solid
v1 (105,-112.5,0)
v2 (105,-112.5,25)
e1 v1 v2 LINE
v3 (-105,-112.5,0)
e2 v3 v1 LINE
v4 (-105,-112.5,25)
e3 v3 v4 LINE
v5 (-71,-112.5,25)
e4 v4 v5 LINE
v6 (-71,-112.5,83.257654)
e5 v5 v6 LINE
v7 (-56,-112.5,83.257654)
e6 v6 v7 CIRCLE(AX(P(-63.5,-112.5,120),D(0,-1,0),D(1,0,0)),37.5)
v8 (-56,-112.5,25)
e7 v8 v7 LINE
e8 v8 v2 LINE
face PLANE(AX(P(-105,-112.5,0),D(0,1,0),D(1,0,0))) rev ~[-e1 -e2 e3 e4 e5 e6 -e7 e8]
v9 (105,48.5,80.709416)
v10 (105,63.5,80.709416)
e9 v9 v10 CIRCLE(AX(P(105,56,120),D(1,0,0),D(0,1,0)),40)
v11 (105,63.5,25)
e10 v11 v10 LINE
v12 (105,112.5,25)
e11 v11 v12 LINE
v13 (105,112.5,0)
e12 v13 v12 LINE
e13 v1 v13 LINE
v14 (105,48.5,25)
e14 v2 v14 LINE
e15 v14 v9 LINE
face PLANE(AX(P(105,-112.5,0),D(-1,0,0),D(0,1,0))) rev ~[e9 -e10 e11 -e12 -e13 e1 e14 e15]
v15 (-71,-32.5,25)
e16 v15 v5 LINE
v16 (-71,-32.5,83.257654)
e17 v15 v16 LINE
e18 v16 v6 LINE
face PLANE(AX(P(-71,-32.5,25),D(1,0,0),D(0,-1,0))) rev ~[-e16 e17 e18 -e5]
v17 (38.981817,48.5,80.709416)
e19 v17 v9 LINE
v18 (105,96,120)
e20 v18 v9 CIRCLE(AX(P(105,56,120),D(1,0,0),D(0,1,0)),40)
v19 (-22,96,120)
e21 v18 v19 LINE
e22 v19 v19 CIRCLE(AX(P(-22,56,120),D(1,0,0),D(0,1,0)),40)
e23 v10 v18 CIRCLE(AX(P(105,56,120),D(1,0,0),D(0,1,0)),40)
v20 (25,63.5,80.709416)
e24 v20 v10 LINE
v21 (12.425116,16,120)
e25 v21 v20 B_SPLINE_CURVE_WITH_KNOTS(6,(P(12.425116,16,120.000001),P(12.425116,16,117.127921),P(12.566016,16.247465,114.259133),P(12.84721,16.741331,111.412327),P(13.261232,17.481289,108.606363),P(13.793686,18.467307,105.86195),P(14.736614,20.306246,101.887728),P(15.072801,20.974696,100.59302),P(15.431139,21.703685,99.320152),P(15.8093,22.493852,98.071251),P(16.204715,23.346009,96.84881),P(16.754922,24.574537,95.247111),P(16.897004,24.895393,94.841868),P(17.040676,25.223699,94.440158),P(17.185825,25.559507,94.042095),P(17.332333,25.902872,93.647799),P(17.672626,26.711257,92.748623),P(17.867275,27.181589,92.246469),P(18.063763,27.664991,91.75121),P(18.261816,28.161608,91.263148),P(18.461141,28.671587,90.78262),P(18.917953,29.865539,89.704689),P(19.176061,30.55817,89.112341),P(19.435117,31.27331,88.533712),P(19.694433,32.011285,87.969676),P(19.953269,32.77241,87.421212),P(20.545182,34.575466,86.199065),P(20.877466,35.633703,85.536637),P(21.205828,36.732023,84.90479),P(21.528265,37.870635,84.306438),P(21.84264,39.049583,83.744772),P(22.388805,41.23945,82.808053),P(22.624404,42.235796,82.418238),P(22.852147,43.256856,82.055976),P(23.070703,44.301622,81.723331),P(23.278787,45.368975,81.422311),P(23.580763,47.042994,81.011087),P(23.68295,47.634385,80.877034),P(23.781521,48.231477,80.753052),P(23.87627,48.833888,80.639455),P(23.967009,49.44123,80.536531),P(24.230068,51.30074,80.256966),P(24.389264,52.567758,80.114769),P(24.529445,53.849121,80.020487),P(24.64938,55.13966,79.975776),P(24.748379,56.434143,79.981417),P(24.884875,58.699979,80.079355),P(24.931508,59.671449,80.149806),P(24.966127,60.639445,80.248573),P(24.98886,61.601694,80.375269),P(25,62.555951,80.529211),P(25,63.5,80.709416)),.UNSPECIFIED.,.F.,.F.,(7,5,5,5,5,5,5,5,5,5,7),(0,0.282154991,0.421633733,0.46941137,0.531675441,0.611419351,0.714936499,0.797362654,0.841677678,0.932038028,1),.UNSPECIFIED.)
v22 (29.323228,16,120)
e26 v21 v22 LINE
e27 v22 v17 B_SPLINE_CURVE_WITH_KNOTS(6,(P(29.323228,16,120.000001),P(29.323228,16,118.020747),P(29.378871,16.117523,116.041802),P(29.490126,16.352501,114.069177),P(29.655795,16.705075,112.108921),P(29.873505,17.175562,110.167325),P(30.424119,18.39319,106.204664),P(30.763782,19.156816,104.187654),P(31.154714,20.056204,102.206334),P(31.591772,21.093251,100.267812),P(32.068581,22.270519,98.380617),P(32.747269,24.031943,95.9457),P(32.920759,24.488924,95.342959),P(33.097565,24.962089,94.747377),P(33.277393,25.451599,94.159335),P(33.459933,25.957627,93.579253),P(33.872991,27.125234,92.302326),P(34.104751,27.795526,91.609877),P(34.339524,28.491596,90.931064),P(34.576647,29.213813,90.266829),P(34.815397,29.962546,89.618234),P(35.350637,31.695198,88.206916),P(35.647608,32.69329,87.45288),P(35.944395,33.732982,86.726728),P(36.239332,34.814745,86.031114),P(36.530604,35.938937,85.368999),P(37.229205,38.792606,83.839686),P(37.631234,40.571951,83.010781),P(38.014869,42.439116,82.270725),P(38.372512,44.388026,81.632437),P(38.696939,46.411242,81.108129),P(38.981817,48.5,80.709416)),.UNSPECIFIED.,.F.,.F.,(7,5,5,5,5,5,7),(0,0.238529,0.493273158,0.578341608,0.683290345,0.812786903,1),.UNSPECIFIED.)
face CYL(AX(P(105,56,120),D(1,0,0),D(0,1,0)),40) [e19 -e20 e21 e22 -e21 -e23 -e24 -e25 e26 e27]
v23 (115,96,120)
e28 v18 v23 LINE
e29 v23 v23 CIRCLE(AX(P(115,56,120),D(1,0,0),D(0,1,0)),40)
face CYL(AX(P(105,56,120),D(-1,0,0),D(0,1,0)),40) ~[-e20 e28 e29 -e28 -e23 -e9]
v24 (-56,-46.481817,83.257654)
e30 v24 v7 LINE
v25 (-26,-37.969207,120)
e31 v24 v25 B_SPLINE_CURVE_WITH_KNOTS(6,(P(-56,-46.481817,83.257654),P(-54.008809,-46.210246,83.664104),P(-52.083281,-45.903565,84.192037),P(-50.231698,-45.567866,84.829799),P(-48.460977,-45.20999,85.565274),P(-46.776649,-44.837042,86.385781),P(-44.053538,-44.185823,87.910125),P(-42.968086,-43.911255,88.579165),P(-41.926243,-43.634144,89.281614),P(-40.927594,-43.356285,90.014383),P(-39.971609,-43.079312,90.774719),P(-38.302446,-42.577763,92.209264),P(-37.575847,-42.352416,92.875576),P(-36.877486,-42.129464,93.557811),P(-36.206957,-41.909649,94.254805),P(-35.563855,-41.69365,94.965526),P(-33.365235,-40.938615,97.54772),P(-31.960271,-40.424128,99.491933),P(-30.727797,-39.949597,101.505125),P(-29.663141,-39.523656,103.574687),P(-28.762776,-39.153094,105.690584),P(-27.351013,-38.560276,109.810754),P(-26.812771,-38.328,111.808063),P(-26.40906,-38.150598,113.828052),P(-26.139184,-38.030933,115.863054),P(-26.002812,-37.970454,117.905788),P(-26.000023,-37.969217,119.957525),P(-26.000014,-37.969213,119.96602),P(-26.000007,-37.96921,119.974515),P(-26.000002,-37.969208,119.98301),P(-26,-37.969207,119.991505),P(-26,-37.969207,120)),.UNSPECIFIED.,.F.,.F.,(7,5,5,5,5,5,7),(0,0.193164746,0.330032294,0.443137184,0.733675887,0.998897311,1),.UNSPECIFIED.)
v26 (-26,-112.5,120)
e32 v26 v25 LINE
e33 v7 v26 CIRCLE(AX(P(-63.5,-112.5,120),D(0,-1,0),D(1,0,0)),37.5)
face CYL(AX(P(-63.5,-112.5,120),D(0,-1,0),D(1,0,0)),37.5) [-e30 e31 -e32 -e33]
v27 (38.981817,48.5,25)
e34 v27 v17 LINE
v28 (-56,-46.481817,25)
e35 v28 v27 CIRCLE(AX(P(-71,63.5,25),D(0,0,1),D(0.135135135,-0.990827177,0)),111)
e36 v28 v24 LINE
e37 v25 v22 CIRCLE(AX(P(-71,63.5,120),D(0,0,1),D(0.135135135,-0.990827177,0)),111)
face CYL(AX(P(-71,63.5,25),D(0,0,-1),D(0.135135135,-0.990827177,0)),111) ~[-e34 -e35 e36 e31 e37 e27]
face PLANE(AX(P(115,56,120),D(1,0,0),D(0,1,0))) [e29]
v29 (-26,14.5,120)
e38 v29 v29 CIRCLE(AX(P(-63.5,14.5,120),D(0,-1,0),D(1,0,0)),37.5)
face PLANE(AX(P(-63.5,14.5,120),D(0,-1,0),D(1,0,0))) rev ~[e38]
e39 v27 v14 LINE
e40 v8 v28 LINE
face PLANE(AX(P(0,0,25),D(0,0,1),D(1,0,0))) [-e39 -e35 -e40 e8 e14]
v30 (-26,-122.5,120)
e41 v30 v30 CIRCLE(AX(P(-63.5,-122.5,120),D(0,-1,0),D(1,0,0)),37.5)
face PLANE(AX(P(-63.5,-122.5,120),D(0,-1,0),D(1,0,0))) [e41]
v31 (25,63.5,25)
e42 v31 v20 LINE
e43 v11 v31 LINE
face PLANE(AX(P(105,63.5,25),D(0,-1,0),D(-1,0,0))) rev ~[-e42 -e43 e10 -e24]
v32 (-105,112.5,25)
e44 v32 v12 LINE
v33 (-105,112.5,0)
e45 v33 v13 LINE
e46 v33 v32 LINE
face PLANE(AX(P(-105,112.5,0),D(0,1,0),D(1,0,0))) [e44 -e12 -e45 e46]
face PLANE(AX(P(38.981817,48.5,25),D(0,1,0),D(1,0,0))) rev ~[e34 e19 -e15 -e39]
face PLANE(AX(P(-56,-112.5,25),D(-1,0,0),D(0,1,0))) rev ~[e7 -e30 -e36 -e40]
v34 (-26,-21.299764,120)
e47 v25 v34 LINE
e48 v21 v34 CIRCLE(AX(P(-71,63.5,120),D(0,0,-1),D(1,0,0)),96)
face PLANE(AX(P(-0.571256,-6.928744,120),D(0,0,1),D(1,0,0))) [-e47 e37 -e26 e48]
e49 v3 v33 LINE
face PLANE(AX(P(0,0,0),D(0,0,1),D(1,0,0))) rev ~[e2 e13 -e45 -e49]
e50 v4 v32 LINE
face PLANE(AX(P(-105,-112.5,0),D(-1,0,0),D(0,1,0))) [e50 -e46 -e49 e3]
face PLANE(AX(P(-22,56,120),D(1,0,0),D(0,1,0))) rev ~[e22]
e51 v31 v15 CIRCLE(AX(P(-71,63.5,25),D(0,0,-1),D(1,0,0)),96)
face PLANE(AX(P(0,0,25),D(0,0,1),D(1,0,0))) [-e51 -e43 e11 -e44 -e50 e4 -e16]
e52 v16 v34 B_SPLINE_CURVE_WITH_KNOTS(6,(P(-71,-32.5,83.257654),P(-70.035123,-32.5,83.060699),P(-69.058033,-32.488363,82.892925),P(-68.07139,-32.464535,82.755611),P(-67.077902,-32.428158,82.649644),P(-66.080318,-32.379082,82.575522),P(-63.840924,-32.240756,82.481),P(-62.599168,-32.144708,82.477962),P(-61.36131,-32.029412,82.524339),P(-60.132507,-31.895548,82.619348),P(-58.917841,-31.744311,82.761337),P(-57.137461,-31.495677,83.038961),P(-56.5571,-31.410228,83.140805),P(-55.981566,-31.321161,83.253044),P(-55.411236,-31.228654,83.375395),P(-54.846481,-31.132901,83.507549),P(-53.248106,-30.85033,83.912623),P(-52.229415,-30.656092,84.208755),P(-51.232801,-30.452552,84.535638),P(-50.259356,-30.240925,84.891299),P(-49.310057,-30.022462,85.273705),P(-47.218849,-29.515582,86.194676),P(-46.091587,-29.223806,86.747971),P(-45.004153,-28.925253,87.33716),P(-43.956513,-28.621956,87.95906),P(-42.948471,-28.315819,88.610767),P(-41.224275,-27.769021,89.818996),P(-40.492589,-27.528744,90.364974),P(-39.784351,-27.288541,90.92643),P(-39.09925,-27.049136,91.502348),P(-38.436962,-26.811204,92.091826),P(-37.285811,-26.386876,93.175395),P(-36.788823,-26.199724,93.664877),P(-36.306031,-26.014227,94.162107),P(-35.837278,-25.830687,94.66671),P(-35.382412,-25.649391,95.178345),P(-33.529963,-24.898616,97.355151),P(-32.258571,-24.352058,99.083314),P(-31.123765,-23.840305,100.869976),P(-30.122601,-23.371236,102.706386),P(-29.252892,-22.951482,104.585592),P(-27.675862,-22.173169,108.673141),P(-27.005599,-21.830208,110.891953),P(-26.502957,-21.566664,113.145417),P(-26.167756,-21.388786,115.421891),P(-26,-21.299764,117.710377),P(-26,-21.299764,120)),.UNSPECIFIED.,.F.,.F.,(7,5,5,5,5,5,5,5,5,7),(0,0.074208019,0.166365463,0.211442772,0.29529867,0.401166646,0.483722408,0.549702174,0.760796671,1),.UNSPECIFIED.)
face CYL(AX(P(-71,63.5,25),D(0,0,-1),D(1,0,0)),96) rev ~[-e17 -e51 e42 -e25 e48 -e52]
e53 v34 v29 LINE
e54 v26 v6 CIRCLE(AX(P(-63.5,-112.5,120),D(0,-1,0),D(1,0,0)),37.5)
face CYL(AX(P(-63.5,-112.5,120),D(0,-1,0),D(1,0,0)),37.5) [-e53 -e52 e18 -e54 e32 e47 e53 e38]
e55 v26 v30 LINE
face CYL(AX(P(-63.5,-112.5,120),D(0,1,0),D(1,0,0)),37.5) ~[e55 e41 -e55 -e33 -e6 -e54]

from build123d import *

# Parameters (mm, degrees)
F0_W          = 210
F0_H          = 225
F1_DEPTH      = 25
F3_DEPTH      = 95
F4_R          = 40
F5_DEPTH      = 10
F5_DEPTH_BACK = 127
F6_R          = 37.5
F7_DEPTH      = 10
F7_DEPTH_BACK = 127


with BuildPart() as f1:
    # F0 (on Top) → F1 (new body)
    with BuildSketch(Plane.XY):
        Rectangle(F0_W, F0_H)
    extrude(amount=F1_DEPTH)

    # F2 (on face) → F3 (join)
    with BuildSketch(Plane.XY.offset(25)):
        with BuildLine():
            Line((-71, -32.5), (-71, -112.5))
            Line((-71, -112.5), (-56, -112.5))
            Line((-56, -112.5), (-56, -46.4818166789))
            ThreePointArc((-56, -46.4818166789), (7.4888527117, -14.9888527117), (38.9818166789, 48.5))
            Line((38.9818166789, 48.5), (105, 48.5))
            Line((105, 48.5), (105, 63.5))
            Line((105, 63.5), (25, 63.5))
            ThreePointArc((25, 63.5), (-3.1177490061, -4.3822509939), (-71, -32.5))
        make_face()
    extrude(amount=F3_DEPTH)

    # F4 (on face) → F5 (join, two sides)
    with BuildSketch(Plane.YZ.offset(105)) as f5_sk:
        with Locations((56, 120)):
            Circle(F4_R)
    extrude(amount=F5_DEPTH)
    extrude(f5_sk.sketch, amount=-F5_DEPTH_BACK)

    # F6 (on face) → F7 (join, two sides)
    with BuildSketch(Plane.XZ.offset(112.5)) as f7_sk:
        with Locations((-63.5, 120)):
            Circle(F6_R)
        with BuildLine():
            ThreePointArc((-56, 83.2576538583), (-34.4526249034, 96.2829175487), (-26, 120))
            ThreePointArc((-26, 120), (-87.2170824513, 149.0473750966), (-71, 83.2576538583))
            Line((-71, 83.2576538583), (-71, 120))
            Line((-71, 120), (-56, 120))
            Line((-56, 120), (-56, 83.2576538583))
        make_face()
    extrude(amount=F7_DEPTH)
    extrude(f7_sk.sketch, amount=-F7_DEPTH_BACK)


solid = f1.part
